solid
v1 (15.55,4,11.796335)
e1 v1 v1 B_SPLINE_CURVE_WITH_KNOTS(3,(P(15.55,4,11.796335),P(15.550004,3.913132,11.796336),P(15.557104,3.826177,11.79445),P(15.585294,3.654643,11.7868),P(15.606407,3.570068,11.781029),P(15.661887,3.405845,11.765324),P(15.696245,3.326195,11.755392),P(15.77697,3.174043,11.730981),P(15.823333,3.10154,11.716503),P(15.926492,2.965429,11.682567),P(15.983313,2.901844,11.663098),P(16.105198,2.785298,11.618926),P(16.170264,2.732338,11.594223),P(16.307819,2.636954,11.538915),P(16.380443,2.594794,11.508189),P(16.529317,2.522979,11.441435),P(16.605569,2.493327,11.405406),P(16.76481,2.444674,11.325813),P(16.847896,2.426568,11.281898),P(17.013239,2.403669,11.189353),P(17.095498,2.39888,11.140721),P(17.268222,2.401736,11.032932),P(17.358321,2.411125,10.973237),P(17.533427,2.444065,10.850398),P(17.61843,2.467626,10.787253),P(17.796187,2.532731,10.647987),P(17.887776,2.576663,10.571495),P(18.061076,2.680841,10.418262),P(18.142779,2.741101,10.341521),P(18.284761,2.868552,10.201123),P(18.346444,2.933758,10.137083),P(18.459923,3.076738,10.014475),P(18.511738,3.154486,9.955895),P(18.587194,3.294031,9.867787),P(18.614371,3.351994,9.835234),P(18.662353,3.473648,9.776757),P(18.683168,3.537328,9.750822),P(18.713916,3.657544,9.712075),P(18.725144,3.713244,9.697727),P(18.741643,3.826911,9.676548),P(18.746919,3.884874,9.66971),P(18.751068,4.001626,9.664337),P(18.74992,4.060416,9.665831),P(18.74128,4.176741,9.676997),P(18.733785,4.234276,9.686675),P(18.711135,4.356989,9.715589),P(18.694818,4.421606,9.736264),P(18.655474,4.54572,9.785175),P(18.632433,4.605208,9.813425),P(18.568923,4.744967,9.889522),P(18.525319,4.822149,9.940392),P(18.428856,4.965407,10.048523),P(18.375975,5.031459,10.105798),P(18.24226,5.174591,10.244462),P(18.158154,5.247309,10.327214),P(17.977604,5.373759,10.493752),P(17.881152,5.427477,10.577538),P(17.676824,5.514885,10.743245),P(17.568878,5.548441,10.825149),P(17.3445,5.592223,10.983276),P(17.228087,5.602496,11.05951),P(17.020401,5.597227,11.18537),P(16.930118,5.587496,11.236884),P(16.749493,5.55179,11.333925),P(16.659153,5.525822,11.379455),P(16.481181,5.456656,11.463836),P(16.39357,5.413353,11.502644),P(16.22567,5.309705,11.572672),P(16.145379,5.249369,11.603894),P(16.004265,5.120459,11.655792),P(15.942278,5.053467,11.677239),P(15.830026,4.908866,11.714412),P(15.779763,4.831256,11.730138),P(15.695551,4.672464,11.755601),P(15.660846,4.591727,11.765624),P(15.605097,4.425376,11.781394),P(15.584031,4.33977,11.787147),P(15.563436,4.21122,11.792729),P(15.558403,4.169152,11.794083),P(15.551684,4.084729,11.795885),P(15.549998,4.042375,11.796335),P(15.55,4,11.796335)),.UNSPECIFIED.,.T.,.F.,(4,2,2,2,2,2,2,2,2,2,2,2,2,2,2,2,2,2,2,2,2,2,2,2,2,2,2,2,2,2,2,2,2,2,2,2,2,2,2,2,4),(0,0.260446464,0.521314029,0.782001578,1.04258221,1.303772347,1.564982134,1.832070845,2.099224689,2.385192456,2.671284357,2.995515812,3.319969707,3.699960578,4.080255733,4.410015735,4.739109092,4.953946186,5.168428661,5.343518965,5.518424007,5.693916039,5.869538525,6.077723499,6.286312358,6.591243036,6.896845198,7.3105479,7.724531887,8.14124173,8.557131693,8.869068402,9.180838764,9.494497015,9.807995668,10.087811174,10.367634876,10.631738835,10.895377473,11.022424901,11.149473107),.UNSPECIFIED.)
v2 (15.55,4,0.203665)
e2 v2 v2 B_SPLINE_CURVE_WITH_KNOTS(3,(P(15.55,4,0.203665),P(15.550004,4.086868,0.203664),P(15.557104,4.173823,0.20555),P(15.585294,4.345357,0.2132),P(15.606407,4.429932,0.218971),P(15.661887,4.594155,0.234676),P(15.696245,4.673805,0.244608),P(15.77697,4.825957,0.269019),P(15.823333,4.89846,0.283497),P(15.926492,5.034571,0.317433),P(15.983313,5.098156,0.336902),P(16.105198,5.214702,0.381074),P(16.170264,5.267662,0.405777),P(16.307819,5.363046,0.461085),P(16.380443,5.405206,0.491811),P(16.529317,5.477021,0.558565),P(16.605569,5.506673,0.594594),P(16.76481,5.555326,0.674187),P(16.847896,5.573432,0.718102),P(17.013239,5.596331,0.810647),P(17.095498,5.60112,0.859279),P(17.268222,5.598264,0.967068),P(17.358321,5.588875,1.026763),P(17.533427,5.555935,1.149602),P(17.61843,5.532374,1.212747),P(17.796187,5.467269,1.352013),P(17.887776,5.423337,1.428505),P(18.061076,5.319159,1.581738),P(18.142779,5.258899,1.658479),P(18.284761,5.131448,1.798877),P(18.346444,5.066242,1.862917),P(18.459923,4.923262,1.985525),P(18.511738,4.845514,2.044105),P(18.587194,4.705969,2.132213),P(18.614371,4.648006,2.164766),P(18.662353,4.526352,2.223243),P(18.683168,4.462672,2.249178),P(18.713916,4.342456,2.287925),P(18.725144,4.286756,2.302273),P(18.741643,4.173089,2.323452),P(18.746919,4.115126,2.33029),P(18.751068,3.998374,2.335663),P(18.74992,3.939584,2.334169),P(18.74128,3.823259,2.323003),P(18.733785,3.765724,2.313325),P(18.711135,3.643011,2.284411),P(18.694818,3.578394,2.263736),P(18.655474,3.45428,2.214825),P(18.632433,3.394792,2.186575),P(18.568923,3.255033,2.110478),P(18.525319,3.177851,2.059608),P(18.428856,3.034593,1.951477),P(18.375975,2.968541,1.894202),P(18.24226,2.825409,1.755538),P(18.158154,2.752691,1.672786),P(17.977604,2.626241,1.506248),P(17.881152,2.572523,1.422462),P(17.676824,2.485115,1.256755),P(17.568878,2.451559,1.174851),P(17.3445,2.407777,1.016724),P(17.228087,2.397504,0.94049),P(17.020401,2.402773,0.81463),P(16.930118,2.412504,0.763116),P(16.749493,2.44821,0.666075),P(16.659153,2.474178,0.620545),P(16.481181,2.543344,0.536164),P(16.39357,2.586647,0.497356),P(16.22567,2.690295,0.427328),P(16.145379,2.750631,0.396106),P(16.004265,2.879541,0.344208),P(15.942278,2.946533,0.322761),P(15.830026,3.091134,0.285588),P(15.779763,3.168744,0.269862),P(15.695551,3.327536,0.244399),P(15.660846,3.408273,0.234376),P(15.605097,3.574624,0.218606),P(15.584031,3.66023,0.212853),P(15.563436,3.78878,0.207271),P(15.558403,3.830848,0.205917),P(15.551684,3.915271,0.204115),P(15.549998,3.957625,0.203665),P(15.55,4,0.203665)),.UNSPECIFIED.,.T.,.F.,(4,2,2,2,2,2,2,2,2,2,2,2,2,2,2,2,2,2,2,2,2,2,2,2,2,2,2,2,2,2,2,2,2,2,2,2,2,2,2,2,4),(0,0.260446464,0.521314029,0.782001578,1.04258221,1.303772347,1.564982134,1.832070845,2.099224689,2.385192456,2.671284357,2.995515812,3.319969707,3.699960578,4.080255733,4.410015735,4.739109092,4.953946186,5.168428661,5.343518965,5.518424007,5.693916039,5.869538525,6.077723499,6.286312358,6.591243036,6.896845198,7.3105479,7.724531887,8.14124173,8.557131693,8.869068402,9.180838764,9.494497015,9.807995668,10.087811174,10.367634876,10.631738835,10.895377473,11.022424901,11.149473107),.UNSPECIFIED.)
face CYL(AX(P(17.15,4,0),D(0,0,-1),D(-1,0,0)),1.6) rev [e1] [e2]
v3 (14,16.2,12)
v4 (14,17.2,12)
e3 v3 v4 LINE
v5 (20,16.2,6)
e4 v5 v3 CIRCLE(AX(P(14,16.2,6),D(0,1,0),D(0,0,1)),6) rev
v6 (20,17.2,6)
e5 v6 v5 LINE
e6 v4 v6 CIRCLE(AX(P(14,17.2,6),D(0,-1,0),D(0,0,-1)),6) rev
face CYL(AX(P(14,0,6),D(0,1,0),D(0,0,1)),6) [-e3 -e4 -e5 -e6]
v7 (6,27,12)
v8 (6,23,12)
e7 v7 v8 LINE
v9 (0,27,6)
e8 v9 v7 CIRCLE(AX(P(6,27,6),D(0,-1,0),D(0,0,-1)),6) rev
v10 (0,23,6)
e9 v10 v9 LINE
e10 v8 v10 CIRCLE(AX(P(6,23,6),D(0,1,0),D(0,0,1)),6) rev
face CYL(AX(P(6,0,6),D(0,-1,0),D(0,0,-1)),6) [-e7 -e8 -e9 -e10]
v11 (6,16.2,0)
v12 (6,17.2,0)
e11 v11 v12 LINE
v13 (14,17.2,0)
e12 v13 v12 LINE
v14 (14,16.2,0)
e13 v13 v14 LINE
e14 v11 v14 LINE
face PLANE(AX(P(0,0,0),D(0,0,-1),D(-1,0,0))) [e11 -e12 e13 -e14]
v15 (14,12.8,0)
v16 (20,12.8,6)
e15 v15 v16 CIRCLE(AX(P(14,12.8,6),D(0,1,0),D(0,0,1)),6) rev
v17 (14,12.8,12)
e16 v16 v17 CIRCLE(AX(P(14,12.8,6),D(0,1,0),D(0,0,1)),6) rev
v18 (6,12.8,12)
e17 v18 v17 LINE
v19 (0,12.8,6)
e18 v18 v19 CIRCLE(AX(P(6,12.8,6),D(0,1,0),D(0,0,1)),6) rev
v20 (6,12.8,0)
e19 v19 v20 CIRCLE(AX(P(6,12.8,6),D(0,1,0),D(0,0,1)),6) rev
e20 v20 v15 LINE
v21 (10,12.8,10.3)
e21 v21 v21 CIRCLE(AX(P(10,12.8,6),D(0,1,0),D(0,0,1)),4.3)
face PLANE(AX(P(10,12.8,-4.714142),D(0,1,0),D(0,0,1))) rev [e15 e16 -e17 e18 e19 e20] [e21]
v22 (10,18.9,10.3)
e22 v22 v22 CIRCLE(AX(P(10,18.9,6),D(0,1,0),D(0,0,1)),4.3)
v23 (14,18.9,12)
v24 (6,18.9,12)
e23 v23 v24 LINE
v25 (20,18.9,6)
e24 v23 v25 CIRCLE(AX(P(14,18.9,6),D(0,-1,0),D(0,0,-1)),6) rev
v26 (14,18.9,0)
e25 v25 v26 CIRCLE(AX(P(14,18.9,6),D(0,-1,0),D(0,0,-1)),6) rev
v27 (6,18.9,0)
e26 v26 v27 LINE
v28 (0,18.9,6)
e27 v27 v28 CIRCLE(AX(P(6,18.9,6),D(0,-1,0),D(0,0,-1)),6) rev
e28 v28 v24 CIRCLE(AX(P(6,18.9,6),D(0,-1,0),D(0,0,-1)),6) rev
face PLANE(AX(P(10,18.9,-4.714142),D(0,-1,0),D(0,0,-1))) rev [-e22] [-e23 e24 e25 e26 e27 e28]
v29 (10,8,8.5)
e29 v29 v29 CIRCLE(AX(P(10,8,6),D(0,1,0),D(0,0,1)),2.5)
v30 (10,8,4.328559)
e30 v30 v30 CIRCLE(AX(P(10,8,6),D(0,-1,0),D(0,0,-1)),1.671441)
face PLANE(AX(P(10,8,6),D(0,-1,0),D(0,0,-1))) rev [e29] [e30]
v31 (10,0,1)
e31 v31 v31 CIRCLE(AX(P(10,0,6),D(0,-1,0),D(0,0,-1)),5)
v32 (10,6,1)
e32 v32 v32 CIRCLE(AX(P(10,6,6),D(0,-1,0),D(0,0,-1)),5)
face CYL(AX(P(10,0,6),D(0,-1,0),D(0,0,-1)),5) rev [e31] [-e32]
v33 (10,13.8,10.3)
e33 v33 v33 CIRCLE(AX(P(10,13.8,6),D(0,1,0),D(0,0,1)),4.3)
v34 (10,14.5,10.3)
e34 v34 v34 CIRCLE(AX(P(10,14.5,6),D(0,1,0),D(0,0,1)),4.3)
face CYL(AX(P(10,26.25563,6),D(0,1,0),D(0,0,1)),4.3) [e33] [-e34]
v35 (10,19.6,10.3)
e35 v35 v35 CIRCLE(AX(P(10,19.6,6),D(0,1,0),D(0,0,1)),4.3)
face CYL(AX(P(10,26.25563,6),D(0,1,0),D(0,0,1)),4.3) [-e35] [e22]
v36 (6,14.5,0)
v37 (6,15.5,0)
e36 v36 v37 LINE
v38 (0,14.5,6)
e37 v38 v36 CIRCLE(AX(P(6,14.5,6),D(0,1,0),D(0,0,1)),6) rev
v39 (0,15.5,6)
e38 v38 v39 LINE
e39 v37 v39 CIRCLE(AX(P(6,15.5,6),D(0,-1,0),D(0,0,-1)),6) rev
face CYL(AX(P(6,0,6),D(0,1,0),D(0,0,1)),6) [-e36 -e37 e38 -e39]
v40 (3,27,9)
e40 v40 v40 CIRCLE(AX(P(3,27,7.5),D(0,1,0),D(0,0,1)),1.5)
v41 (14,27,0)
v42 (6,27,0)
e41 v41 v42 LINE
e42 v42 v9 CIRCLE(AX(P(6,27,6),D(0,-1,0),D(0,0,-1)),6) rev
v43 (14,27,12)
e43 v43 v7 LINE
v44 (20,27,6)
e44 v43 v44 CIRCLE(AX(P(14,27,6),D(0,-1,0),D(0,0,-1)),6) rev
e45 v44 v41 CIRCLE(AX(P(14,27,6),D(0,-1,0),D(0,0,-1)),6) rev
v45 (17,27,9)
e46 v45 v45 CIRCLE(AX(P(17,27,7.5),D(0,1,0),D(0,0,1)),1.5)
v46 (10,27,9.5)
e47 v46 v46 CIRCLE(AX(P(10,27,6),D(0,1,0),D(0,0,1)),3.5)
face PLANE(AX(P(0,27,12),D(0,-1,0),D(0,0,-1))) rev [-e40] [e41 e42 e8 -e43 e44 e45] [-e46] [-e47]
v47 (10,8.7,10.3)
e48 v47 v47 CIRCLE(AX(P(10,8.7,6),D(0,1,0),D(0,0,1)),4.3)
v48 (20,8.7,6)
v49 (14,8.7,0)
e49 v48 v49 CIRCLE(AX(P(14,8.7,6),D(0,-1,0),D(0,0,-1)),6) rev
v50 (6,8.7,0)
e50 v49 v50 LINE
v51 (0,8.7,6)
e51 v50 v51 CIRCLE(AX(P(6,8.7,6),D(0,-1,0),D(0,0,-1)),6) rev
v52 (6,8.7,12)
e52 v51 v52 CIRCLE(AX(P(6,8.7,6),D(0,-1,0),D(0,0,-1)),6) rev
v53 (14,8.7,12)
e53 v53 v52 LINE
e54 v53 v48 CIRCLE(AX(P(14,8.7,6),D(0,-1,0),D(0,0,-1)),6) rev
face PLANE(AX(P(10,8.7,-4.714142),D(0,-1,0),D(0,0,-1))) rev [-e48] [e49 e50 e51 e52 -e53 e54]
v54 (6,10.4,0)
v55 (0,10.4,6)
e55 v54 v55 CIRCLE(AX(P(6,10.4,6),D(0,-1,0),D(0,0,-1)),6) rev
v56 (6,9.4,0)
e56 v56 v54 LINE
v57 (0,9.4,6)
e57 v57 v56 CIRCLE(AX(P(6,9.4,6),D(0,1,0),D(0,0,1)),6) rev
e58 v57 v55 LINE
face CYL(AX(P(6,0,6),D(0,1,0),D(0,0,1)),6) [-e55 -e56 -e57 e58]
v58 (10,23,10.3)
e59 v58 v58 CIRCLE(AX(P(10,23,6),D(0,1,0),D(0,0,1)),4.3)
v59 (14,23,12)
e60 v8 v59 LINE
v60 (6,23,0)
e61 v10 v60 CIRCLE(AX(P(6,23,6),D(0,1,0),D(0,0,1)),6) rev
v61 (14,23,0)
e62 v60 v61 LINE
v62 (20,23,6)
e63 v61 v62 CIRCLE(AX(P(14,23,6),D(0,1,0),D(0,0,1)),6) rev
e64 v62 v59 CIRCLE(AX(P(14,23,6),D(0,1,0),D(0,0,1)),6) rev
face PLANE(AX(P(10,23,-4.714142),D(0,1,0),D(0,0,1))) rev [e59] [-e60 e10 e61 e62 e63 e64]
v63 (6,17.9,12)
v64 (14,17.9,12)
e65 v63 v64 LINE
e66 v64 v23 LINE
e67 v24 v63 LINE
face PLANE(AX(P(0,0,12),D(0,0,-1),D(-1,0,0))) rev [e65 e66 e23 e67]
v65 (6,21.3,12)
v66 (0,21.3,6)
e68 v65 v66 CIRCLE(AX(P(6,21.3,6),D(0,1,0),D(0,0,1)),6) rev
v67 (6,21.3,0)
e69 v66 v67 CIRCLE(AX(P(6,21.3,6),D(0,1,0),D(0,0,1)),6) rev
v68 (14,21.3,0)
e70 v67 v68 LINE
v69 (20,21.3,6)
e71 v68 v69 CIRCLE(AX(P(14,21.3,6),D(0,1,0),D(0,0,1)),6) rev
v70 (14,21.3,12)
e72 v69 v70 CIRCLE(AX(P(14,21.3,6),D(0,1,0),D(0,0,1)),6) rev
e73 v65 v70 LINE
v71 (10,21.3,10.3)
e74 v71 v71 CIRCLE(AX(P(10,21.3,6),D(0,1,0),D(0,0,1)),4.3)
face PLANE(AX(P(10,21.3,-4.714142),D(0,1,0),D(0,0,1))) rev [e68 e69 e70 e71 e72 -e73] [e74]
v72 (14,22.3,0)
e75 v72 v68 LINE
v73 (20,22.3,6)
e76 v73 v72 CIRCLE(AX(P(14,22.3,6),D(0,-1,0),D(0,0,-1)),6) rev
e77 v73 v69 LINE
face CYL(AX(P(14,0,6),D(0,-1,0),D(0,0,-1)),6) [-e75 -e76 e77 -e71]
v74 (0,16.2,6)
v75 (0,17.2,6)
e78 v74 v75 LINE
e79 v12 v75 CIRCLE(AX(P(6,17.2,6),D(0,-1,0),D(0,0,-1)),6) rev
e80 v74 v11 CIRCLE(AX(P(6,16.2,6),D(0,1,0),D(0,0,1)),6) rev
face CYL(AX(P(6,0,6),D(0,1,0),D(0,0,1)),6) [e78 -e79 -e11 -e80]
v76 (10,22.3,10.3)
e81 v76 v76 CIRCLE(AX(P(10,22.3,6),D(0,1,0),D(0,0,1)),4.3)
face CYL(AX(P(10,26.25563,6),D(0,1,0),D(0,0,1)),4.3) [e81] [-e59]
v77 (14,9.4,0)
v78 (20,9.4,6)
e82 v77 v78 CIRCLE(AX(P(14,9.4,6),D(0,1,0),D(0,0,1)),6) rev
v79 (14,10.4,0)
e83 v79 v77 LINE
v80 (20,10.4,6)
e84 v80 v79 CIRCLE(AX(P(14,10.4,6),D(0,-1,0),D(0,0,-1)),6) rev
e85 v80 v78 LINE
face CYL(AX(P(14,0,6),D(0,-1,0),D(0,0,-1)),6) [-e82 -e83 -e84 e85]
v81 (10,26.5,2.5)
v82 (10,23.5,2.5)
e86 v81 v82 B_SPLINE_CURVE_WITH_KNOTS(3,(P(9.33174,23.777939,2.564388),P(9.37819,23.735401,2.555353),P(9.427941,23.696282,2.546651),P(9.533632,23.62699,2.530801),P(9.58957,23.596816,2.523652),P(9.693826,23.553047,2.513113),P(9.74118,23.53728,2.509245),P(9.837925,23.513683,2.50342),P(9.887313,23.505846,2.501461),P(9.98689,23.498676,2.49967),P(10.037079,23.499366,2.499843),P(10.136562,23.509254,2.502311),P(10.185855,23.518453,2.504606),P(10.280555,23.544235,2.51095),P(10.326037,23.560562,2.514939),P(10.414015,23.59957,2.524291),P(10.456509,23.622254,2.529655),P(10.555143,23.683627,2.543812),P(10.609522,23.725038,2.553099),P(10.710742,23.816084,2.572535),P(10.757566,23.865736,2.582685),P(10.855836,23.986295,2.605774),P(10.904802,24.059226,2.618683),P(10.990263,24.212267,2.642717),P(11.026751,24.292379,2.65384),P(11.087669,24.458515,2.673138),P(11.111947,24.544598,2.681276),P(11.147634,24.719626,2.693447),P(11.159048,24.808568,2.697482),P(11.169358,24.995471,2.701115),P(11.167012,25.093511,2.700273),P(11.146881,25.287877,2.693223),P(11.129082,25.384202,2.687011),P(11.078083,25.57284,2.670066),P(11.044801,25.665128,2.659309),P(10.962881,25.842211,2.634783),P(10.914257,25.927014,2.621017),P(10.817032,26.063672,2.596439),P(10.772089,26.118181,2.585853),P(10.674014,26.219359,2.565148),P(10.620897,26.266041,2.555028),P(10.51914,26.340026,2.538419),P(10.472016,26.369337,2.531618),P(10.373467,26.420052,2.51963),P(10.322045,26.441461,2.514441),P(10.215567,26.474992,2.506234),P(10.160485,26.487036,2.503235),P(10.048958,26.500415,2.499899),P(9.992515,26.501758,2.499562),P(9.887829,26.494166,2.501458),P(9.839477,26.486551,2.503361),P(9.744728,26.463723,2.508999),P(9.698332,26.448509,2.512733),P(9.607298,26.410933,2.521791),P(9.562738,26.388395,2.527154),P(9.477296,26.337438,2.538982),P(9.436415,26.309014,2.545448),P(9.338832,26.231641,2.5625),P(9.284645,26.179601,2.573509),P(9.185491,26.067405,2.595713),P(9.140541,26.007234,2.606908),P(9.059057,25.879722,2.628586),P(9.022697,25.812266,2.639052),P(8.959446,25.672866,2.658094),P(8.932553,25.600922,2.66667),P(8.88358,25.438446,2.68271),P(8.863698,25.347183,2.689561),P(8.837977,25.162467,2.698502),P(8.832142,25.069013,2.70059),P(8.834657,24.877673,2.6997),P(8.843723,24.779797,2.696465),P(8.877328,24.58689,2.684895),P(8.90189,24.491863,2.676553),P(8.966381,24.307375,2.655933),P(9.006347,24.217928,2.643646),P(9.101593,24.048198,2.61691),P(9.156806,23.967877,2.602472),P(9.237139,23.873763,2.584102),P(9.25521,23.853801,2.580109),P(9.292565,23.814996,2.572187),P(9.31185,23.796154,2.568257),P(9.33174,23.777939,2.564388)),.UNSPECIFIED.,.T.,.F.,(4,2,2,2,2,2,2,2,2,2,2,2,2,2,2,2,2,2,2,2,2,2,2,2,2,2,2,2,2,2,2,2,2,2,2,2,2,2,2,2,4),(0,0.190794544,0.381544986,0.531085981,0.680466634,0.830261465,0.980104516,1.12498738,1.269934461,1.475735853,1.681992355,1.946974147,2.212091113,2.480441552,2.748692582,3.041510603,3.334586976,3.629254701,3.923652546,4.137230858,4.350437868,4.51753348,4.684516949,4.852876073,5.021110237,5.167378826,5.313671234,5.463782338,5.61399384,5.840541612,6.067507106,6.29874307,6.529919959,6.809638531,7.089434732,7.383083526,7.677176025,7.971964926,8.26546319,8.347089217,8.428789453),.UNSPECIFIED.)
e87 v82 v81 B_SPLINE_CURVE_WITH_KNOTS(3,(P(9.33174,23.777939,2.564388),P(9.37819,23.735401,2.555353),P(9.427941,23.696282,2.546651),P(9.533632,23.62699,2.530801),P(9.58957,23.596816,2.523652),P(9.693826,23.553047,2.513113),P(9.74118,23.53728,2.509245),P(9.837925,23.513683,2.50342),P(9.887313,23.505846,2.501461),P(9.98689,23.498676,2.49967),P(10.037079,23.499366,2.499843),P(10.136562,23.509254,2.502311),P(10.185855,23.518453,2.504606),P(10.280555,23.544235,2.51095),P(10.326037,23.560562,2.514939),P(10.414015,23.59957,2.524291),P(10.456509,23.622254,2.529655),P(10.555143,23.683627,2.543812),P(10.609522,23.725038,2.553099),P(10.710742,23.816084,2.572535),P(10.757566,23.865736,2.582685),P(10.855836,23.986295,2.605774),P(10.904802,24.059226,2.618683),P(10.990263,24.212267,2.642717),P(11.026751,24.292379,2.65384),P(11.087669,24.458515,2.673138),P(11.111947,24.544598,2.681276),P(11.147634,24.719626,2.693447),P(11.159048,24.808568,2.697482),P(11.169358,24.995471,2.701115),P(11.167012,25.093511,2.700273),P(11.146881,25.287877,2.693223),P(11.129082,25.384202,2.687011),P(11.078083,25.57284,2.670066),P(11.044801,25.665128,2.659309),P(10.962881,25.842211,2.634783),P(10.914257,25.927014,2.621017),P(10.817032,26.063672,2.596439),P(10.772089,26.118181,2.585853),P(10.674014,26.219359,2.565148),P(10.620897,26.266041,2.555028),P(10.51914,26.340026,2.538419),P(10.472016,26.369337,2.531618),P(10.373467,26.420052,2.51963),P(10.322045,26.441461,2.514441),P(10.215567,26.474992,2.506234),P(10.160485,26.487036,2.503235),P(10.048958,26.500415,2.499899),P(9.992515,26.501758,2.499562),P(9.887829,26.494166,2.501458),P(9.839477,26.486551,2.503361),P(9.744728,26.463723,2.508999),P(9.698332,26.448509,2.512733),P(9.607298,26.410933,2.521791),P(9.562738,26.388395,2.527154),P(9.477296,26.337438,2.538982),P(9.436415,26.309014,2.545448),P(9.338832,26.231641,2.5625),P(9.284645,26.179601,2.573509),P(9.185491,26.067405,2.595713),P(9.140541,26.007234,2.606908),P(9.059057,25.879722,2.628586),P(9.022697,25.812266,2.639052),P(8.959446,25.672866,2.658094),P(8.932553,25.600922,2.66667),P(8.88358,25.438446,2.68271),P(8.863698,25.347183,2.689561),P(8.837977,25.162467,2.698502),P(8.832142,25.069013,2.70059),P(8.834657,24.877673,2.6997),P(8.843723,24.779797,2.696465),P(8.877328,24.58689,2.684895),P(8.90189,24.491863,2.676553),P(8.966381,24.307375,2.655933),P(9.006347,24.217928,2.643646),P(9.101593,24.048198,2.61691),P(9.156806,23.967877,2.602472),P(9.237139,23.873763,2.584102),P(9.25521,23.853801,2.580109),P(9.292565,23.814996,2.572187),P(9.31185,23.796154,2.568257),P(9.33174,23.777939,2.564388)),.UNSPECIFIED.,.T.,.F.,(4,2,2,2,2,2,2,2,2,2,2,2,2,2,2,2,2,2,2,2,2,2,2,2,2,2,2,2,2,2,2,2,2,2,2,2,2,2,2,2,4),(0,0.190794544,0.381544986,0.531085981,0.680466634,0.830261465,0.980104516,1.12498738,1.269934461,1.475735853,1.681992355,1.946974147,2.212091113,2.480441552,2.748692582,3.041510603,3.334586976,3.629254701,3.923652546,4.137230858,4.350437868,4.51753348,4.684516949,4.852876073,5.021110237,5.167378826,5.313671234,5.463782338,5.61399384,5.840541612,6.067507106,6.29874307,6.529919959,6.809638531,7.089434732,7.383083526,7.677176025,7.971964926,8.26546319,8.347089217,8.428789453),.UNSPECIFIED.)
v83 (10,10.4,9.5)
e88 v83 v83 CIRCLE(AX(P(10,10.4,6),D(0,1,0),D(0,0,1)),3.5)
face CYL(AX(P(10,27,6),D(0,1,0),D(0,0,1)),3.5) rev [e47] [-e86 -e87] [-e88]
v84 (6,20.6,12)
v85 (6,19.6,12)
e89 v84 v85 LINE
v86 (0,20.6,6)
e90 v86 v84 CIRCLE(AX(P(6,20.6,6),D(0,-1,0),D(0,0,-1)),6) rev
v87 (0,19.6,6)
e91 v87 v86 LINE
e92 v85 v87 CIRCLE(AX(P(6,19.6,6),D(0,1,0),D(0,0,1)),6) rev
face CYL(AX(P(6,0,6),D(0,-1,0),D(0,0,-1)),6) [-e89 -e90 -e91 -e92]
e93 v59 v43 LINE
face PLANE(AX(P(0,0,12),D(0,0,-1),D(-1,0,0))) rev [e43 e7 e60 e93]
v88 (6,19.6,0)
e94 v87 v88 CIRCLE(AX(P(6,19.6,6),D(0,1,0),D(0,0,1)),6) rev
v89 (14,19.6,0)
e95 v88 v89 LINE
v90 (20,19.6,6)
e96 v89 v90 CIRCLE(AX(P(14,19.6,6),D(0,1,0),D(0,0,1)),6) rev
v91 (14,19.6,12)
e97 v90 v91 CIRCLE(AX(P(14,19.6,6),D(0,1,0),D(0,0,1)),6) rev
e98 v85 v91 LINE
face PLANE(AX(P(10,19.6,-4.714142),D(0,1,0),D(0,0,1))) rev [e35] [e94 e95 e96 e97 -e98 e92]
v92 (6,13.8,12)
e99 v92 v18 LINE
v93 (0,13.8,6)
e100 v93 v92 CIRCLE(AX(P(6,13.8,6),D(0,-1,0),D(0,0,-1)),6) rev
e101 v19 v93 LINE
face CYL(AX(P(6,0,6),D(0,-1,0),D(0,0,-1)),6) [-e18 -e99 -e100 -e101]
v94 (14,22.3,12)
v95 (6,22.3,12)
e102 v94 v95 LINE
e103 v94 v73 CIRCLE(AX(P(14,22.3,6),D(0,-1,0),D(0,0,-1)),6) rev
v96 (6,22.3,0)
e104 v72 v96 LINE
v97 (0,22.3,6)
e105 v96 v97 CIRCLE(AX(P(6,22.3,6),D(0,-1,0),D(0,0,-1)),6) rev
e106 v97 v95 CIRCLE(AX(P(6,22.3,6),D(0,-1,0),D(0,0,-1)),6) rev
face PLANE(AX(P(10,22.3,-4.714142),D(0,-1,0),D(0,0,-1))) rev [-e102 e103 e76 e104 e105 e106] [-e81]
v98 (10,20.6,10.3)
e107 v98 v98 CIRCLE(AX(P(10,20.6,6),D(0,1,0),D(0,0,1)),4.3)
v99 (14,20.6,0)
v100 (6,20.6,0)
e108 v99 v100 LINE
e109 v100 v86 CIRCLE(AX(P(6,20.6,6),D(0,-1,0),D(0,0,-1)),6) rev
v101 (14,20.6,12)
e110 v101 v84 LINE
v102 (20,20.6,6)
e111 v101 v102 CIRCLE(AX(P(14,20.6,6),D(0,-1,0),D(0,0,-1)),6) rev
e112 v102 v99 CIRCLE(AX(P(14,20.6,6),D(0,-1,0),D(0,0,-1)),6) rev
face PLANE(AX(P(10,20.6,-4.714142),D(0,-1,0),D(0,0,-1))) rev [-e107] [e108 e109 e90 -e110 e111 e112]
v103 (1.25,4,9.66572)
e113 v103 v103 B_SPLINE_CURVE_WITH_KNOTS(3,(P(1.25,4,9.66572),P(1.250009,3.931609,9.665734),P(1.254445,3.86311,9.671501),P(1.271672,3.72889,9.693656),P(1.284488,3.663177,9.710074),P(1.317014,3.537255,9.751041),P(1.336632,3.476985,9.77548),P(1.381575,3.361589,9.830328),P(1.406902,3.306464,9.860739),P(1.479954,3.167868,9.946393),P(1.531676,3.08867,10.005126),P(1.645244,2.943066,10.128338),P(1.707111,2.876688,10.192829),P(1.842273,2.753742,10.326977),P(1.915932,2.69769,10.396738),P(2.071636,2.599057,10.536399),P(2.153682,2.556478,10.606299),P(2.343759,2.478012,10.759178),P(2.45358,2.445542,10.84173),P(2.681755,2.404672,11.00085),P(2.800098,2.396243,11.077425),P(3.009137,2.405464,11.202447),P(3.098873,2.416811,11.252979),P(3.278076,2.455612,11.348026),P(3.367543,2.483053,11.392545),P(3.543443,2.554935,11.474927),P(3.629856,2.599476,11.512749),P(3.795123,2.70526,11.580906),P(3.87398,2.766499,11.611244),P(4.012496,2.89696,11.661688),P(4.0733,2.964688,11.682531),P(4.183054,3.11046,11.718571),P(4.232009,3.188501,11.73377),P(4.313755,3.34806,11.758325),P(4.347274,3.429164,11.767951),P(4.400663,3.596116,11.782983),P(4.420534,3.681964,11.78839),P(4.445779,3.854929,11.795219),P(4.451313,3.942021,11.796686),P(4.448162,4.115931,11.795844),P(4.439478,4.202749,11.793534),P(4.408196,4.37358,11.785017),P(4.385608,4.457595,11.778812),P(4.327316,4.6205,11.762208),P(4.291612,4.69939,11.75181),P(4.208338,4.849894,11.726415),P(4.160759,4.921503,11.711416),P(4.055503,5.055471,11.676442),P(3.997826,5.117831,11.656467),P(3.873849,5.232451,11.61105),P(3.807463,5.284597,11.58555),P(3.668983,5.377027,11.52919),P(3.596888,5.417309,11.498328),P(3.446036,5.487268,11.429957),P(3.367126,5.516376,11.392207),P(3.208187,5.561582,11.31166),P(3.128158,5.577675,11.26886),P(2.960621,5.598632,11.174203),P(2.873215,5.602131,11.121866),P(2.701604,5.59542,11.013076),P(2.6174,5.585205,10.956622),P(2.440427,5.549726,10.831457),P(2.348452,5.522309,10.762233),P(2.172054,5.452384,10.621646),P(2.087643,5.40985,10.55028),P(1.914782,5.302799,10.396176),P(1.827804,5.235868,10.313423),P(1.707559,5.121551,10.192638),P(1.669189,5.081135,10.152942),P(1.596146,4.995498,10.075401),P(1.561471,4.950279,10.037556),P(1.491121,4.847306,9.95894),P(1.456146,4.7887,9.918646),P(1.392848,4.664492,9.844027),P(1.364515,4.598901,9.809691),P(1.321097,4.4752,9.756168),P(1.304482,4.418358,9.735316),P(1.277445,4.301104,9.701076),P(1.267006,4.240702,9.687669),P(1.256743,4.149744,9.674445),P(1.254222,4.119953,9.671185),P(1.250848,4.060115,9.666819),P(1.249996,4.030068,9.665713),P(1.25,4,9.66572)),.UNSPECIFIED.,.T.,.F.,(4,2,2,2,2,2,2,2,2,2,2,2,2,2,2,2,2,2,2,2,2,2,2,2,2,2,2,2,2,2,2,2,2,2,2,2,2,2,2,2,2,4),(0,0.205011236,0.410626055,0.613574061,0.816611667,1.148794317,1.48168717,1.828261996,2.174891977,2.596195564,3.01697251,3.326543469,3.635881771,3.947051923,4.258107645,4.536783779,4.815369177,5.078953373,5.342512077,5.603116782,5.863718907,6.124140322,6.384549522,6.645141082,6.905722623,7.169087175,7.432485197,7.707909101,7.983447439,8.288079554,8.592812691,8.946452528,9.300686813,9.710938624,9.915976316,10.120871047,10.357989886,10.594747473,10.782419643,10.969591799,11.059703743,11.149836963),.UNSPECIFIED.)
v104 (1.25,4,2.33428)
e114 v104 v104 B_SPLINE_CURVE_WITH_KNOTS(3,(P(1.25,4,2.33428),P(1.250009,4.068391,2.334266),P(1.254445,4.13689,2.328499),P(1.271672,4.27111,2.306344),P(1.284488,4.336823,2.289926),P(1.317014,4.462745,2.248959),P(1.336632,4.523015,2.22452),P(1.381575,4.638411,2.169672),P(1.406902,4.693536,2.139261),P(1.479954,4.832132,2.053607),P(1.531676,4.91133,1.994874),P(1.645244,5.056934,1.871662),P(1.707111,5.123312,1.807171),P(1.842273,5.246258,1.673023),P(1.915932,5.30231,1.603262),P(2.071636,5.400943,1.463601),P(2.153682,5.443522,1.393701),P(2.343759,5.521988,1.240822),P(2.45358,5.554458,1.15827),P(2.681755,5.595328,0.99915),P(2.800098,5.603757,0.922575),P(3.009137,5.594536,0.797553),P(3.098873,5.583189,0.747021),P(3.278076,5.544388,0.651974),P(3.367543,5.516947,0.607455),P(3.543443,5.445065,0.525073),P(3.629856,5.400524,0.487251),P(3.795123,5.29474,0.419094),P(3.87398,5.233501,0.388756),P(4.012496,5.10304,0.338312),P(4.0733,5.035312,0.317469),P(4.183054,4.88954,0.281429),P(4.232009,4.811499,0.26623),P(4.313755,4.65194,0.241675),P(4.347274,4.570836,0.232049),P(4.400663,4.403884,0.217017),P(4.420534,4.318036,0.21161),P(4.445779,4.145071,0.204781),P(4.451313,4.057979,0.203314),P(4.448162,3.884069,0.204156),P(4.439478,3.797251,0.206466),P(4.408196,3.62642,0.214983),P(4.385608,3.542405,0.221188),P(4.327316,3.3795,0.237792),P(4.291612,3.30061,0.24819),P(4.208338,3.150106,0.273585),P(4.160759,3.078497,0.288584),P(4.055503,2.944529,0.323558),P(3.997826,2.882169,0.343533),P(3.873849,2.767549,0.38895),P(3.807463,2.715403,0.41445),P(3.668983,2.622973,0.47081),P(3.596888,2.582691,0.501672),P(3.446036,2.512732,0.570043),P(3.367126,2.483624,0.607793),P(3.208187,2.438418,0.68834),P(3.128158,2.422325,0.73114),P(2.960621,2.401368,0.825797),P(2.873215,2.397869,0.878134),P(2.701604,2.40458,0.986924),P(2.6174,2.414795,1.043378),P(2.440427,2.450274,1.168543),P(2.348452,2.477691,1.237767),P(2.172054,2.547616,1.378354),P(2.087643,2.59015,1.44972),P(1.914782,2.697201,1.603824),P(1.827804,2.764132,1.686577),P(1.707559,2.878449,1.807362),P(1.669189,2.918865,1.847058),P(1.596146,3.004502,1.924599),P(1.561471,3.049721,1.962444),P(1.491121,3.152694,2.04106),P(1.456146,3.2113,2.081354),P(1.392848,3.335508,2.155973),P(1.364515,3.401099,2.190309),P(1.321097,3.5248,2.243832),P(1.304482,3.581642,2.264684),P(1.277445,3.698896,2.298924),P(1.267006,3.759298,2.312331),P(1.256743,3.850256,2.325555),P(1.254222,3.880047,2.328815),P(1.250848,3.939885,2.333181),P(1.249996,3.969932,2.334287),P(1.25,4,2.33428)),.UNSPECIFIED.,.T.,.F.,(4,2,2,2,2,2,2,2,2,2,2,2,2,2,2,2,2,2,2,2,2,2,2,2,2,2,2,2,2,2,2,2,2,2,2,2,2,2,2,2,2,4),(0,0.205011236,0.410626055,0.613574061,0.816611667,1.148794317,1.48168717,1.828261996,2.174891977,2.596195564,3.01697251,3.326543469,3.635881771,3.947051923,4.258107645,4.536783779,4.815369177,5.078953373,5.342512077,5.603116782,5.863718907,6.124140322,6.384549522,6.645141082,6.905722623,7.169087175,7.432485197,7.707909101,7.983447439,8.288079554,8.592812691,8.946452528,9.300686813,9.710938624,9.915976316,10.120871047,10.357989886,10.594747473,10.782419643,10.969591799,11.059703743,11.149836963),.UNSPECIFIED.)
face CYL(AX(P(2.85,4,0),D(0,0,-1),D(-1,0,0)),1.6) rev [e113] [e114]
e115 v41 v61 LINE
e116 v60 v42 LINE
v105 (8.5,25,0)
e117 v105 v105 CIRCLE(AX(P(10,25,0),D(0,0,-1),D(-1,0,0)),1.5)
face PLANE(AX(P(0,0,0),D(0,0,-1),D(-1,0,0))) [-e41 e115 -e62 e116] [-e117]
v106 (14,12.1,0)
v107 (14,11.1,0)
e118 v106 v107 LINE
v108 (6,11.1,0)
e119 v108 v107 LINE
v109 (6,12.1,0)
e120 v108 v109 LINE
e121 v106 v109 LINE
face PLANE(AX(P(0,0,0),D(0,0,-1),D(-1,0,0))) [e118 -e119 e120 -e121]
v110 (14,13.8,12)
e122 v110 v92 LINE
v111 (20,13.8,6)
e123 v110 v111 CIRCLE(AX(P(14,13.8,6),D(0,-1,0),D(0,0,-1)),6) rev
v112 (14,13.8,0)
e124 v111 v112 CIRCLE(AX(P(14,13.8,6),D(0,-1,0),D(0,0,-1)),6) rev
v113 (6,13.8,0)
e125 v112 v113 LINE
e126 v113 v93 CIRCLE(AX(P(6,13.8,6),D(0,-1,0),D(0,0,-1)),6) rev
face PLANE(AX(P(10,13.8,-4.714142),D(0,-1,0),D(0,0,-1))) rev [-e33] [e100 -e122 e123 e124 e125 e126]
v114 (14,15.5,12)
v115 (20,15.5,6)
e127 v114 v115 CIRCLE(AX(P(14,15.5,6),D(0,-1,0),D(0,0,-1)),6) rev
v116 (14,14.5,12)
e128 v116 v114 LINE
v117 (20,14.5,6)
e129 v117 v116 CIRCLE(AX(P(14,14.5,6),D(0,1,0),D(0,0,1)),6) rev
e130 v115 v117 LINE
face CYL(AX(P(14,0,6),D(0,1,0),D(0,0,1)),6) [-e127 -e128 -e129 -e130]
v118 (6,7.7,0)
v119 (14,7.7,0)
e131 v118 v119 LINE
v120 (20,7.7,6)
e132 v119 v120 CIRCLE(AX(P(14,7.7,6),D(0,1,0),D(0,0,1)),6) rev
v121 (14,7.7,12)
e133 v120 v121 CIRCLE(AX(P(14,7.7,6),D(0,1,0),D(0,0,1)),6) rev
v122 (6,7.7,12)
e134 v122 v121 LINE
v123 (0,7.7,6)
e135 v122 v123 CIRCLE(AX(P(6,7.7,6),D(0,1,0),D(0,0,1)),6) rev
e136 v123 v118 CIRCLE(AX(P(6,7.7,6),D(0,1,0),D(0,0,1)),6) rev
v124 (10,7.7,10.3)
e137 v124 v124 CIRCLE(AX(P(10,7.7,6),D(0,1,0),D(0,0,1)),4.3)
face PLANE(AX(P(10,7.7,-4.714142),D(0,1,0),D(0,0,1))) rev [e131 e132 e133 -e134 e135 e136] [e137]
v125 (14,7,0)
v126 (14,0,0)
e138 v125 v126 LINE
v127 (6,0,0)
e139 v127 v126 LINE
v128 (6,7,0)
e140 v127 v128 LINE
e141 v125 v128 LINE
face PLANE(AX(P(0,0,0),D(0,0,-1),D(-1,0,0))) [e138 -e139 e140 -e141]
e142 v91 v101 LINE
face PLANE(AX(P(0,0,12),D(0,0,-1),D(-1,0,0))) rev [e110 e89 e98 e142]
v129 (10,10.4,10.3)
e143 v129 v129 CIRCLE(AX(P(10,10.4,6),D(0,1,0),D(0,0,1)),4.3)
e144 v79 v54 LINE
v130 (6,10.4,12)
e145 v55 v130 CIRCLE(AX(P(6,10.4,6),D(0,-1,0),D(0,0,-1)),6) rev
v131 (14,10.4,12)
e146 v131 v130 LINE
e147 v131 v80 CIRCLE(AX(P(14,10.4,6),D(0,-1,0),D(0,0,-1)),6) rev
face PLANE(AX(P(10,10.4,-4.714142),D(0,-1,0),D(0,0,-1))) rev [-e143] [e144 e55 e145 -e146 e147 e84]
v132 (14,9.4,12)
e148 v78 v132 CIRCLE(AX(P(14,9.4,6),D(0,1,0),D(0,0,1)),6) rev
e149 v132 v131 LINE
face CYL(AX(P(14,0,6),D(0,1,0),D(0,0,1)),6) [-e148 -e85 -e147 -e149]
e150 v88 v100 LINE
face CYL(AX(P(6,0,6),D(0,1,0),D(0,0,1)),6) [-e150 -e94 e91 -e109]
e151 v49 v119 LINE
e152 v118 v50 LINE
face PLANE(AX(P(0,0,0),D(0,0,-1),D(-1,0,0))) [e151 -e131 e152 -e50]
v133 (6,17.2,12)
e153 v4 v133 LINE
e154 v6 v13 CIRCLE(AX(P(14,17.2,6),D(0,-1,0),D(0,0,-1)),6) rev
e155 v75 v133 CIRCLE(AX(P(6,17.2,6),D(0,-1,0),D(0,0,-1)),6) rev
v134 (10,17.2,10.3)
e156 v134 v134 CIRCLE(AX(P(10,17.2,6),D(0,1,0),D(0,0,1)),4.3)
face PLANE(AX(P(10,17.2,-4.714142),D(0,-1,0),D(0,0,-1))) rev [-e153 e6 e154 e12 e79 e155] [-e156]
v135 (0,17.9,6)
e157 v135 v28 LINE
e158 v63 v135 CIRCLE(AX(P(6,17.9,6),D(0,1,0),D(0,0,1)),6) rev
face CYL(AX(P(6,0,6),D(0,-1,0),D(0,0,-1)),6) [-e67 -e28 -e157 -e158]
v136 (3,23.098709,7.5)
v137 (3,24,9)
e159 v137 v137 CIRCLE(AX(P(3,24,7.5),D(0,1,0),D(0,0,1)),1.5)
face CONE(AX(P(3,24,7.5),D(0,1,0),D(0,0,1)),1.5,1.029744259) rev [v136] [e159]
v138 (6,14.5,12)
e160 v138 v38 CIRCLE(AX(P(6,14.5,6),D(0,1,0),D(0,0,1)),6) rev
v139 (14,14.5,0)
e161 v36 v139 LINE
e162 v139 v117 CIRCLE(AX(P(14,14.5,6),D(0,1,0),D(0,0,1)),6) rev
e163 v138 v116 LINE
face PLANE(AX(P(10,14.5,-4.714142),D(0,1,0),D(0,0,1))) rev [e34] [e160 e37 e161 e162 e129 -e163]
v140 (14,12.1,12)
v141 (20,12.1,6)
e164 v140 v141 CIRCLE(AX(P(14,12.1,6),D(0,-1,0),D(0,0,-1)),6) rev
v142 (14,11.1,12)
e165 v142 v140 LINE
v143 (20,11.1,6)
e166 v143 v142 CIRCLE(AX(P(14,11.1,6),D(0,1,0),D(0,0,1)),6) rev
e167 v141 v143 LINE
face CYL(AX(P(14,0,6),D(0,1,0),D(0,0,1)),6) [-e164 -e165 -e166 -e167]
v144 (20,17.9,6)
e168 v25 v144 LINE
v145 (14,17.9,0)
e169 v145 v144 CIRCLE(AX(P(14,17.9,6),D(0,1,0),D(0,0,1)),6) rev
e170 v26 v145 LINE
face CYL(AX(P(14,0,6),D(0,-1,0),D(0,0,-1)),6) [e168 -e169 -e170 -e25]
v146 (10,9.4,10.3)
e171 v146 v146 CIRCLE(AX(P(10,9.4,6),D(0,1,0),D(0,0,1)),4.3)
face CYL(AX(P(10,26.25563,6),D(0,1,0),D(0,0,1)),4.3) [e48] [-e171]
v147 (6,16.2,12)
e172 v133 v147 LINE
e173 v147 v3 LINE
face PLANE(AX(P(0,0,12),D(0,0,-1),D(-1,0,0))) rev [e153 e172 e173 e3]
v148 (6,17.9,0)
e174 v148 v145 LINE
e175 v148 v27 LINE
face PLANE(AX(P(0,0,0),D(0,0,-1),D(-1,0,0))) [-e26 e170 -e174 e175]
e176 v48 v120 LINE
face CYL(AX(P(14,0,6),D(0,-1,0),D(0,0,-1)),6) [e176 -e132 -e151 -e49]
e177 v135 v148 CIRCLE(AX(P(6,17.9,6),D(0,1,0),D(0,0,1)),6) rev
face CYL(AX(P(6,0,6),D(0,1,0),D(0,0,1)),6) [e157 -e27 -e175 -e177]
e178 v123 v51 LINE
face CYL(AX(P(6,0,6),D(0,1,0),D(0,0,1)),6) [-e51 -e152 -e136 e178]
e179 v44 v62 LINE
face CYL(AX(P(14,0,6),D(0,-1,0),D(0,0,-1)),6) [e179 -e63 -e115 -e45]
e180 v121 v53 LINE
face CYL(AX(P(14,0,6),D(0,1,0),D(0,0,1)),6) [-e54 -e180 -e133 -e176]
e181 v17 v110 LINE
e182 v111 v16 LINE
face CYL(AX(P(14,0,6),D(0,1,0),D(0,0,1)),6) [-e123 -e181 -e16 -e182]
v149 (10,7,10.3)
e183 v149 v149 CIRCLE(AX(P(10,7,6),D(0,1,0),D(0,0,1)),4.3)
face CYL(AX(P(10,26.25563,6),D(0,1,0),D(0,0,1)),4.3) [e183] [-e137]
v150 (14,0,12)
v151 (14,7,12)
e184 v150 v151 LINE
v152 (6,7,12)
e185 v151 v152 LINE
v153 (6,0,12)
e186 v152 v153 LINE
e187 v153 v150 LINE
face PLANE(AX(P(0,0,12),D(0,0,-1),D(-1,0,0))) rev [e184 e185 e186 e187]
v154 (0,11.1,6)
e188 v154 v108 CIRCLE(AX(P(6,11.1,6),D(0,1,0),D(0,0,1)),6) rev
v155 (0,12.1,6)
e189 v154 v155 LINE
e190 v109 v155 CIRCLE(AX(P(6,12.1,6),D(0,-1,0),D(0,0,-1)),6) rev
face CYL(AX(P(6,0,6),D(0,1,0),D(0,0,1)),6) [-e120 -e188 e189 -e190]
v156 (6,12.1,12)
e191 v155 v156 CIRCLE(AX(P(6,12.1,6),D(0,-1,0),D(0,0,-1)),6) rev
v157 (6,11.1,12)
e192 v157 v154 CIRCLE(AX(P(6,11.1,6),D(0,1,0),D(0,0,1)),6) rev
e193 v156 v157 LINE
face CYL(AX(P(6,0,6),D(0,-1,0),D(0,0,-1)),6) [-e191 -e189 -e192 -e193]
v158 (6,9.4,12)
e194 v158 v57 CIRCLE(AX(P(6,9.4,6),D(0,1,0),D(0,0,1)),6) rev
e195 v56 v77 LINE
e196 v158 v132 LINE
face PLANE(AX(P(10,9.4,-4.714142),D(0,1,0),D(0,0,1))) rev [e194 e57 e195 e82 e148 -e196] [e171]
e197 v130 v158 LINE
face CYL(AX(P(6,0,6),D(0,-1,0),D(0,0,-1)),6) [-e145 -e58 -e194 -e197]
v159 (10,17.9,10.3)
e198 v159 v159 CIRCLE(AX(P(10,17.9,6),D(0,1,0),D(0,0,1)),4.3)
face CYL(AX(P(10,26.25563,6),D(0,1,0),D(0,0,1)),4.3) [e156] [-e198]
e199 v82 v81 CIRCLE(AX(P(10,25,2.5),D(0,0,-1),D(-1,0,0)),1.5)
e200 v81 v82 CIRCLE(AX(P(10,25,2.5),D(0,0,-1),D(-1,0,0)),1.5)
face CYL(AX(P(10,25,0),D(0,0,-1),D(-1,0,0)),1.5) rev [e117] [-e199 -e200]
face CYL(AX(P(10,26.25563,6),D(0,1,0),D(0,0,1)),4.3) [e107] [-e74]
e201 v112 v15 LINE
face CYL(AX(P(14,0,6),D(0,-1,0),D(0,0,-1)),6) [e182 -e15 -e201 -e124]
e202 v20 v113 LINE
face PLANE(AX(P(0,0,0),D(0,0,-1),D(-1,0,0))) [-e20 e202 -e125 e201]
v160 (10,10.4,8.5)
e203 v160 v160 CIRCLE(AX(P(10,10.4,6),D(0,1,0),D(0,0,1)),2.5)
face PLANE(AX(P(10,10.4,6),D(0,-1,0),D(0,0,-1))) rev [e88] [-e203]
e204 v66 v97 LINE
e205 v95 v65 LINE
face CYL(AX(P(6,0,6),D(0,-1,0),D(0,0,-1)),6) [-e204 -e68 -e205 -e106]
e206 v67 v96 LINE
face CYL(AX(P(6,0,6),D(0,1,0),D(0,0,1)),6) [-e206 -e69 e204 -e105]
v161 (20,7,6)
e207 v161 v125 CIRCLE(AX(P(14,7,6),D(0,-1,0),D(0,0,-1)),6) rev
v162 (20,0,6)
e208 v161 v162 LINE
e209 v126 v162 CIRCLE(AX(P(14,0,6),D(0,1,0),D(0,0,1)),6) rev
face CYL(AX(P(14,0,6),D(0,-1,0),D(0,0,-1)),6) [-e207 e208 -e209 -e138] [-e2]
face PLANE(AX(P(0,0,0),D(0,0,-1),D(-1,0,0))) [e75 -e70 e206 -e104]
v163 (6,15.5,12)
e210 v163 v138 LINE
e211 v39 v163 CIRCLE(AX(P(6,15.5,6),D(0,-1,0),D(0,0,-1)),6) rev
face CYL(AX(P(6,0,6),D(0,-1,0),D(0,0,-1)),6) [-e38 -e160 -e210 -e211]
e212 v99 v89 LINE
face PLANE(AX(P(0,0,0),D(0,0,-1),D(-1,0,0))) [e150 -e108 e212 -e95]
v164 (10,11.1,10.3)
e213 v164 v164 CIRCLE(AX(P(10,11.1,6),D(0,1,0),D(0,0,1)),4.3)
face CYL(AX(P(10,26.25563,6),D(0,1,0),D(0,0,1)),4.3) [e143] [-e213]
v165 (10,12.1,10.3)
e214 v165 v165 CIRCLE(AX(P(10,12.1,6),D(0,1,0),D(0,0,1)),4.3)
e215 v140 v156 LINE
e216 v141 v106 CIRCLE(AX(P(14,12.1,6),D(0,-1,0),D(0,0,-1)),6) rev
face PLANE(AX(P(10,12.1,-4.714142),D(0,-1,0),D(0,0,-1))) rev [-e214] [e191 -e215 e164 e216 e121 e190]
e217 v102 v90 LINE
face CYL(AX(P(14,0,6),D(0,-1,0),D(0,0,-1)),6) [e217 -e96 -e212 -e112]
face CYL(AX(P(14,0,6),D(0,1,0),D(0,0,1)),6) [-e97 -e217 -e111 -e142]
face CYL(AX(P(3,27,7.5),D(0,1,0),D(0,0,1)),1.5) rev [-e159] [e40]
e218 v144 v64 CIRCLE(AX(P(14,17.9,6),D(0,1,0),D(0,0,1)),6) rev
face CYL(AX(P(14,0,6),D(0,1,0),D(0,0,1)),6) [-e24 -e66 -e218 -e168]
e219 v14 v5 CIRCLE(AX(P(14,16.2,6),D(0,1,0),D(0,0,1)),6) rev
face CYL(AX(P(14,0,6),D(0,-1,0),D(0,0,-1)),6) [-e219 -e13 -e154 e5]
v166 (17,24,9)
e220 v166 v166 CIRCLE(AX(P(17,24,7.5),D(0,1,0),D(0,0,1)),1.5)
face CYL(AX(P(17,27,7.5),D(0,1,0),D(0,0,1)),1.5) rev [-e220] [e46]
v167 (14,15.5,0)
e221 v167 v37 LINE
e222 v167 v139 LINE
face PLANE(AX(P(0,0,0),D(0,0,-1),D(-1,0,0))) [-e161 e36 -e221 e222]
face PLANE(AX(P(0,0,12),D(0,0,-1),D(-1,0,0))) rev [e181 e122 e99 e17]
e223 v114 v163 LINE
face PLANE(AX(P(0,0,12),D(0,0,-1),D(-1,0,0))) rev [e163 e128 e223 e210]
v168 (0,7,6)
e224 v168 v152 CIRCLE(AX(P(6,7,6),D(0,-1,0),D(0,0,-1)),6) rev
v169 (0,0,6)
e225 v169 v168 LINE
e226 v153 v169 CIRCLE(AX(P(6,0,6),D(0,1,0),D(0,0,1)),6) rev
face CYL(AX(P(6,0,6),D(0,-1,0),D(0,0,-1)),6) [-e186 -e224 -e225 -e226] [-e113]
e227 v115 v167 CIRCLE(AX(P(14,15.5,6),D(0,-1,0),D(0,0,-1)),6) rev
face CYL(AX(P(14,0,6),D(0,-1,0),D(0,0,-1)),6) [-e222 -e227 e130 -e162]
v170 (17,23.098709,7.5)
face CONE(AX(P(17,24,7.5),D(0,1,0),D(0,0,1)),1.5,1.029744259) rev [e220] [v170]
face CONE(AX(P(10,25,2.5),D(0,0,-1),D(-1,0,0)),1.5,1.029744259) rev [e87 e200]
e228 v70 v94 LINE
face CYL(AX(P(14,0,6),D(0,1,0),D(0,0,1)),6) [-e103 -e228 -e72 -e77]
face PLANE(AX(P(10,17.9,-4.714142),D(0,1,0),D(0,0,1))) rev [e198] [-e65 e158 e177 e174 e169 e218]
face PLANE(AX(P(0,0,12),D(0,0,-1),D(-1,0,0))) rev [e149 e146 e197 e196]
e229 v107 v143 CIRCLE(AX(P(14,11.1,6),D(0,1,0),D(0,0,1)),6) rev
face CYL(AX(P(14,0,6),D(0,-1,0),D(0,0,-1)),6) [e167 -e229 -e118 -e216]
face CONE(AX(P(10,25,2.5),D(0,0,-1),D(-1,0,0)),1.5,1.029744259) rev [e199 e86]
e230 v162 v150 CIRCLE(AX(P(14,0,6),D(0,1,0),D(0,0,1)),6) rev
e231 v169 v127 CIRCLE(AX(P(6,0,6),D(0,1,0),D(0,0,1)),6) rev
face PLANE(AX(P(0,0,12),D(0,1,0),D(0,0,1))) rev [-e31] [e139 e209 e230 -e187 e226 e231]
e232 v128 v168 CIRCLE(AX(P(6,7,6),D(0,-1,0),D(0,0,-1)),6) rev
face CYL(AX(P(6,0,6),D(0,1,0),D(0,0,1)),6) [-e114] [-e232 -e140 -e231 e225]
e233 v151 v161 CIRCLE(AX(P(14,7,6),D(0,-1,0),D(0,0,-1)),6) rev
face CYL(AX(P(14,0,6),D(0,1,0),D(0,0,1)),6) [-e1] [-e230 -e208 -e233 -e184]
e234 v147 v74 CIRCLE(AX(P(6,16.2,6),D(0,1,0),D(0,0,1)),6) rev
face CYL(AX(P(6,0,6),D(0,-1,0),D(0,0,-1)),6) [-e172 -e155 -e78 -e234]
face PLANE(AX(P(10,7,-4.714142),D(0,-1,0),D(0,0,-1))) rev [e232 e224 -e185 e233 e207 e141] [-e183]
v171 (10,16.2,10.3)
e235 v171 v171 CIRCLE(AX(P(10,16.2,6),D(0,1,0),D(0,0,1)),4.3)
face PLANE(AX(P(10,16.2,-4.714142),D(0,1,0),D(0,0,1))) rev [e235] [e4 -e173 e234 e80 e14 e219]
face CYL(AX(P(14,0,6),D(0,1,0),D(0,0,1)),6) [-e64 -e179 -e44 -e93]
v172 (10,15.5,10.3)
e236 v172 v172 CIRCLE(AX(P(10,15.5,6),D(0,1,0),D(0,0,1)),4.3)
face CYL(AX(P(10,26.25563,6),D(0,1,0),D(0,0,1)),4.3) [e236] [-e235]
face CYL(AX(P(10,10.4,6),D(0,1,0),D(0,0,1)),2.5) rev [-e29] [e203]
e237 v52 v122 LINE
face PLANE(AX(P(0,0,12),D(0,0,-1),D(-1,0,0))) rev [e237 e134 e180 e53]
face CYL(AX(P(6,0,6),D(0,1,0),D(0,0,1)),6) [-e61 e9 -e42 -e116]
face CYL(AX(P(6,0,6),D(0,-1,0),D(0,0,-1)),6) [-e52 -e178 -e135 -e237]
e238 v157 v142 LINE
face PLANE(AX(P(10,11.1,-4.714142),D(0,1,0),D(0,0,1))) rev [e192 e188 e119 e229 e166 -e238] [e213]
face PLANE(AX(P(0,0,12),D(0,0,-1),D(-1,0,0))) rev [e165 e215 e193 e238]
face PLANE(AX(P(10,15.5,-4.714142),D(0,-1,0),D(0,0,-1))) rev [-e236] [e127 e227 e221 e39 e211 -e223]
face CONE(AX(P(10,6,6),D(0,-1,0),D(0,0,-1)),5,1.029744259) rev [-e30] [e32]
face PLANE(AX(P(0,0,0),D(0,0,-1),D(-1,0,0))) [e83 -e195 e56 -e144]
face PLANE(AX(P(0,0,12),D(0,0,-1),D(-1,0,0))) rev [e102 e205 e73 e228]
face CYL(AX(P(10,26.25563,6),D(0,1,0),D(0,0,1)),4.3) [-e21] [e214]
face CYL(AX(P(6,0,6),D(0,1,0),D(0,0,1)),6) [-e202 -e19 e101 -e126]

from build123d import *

# Parameters (mm, degrees)
SZKIC1_W                    = 20
SZKIC1_H                    = 27
DODANIE_WYCI_GNI_CIE1_DEPTH = 12
ZAOKR_GLENIE2_R             = 6
SKETCH3_W                   = 6.414141748
SKETCH3_H                   = 0.7
F_3_0MM_DOWEL_HOLE2_D       = 3
F_3_0MM_DOWEL_HOLE2_DEPTH   = 2.5
F_3_0MM_DOWEL_HOLE2_TIP     = 0.901290929
F_3_0MM_DOWEL_HOLE3_D       = 3.2
F_6_0MM_DOWEL_HOLE1_D       = 7
F_6_0MM_DOWEL_HOLE1_DEPTH   = 16.6
F_3_0MM_DOWEL_HOLE4_D       = 3
F_3_0MM_DOWEL_HOLE4_DEPTH   = 3
F_3_0MM_DOWEL_HOLE4_TIP     = 0.901290929
F_5_0MM_DOWEL_HOLE1_D       = 5
F_5_0MM_DOWEL_HOLE1_DEPTH   = 2.4
F_10_0MM_DOWEL_HOLE3_D      = 10
F_10_0MM_DOWEL_HOLE3_DEPTH  = 6
F_10_0MM_DOWEL_HOLE3_TIP    = 3.004303095


with BuildPart() as part:
    # Szkic1 → Dodanie-wyciągnięcie1 (new body)
    with BuildSketch(Plane.XY):
        with Locations((10, 13.5)):
            Rectangle(SZKIC1_W, SZKIC1_H)
    extrude(amount=DODANIE_WYCI_GNI_CIE1_DEPTH)

    # Zaokrąglenie2
    zaokr_glenie2_edges = [part.edges().sort_by_distance(p)[0] for p in [
        (20, 13.5, 0),
        (20, 13.5, 12),
        (0, 13.5, 0),
        (0, 13.5, 12),
    ]]
    fillet(zaokr_glenie2_edges, radius=ZAOKR_GLENIE2_R - 0.0001)  # a hair under: the kernel refuses the full size

    # Sketch3 → Cut-Revolve1 (revolve, cut)
    with BuildSketch(Plane.ZY.offset(-10), mode=Mode.PRIVATE) as cut_revolve1_sk:
        with Locations((-1.507070874, 22.65)):
            Rectangle(SKETCH3_W, SKETCH3_H)
        with Locations((-1.507070874, 20.95)):
            Rectangle(SKETCH3_W, SKETCH3_H)
        with Locations((-1.507070874, 19.25)):
            Rectangle(SKETCH3_W, SKETCH3_H)
        with Locations((-1.507070874, 17.55)):
            Rectangle(SKETCH3_W, SKETCH3_H)
        with Locations((-1.507070874, 15.85)):
            Rectangle(SKETCH3_W, SKETCH3_H)
        with Locations((-1.507070874, 14.15)):
            Rectangle(SKETCH3_W, SKETCH3_H)
        with Locations((-1.507070874, 12.45)):
            Rectangle(SKETCH3_W, SKETCH3_H)
        with Locations((-1.507070874, 10.75)):
            Rectangle(SKETCH3_W, SKETCH3_H)
        with Locations((-1.507070874, 9.05)):
            Rectangle(SKETCH3_W, SKETCH3_H)
        with Locations((-1.507070874, 7.35)):
            Rectangle(SKETCH3_W, SKETCH3_H)
    revolve(cut_revolve1_sk.sketch.rotate(Axis((10, 26.25563002, 6), (0, -1, 0)), 180), axis=Axis((10, 26.25563002, 6), (0, -1, 0)), mode=Mode.SUBTRACT)

    # Ø3.0mm Dowel Hole2
    with Locations(Plane(origin=(0, 0, 0), x_dir=(-1, 0, 0), z_dir=(0, 0, -1))):
        with Locations((-10, 25)):
            Hole(F_3_0MM_DOWEL_HOLE2_D / 2, depth=F_3_0MM_DOWEL_HOLE2_DEPTH)
            with Locations((0, 0, -(F_3_0MM_DOWEL_HOLE2_DEPTH + F_3_0MM_DOWEL_HOLE2_TIP / 2))):  # 118° drill point
                Cone(0, F_3_0MM_DOWEL_HOLE2_D / 2, F_3_0MM_DOWEL_HOLE2_TIP, mode=Mode.SUBTRACT)

    # Ø3.0mm Dowel Hole3 (through all)
    with Locations(Plane(origin=(17.15, 4, 0), x_dir=(-1, 0, 0), z_dir=(0, 0, -1))):
        with Locations((0, 0), (14.3, 0)):
            Hole(F_3_0MM_DOWEL_HOLE3_D / 2)

    # Ø6.0mm Dowel Hole1
    with Locations(Plane(origin=(0, 27, 0), x_dir=(1, 0, 0), z_dir=(0, 1, 0))):
        with Locations((10, -6)):
            Hole(F_6_0MM_DOWEL_HOLE1_D / 2, depth=F_6_0MM_DOWEL_HOLE1_DEPTH)

    # Ø3.0mm Dowel Hole4
    with Locations(Plane(origin=(0, 27, 0), x_dir=(1, 0, 0), z_dir=(0, 1, 0))):
        with Locations((17, -7.5), (3, -7.5)):
            Hole(F_3_0MM_DOWEL_HOLE4_D / 2, depth=F_3_0MM_DOWEL_HOLE4_DEPTH)
            with Locations((0, 0, -(F_3_0MM_DOWEL_HOLE4_DEPTH + F_3_0MM_DOWEL_HOLE4_TIP / 2))):  # 118° drill point
                Cone(0, F_3_0MM_DOWEL_HOLE4_D / 2, F_3_0MM_DOWEL_HOLE4_TIP, mode=Mode.SUBTRACT)

    # Ø5.0mm Dowel Hole1
    with Locations(Plane(origin=(0, 10.4, 0), x_dir=(1, 0, 0), z_dir=(0, 1, 0))):
        with Locations((10, -6)):
            Hole(F_5_0MM_DOWEL_HOLE1_D / 2, depth=F_5_0MM_DOWEL_HOLE1_DEPTH)

    # Ø10.0mm Dowel Hole3
    with Locations(Plane(origin=(0, 0, 0), x_dir=(-1, 0, 0), z_dir=(0, -1, 0))):
        with Locations((-10, -6)):
            Hole(F_10_0MM_DOWEL_HOLE3_D / 2, depth=F_10_0MM_DOWEL_HOLE3_DEPTH)
            with Locations((0, 0, -(F_10_0MM_DOWEL_HOLE3_DEPTH + F_10_0MM_DOWEL_HOLE3_TIP / 2))):  # 118° drill point
                Cone(0, F_10_0MM_DOWEL_HOLE3_D / 2, F_10_0MM_DOWEL_HOLE3_TIP, mode=Mode.SUBTRACT)


solid = part.part
